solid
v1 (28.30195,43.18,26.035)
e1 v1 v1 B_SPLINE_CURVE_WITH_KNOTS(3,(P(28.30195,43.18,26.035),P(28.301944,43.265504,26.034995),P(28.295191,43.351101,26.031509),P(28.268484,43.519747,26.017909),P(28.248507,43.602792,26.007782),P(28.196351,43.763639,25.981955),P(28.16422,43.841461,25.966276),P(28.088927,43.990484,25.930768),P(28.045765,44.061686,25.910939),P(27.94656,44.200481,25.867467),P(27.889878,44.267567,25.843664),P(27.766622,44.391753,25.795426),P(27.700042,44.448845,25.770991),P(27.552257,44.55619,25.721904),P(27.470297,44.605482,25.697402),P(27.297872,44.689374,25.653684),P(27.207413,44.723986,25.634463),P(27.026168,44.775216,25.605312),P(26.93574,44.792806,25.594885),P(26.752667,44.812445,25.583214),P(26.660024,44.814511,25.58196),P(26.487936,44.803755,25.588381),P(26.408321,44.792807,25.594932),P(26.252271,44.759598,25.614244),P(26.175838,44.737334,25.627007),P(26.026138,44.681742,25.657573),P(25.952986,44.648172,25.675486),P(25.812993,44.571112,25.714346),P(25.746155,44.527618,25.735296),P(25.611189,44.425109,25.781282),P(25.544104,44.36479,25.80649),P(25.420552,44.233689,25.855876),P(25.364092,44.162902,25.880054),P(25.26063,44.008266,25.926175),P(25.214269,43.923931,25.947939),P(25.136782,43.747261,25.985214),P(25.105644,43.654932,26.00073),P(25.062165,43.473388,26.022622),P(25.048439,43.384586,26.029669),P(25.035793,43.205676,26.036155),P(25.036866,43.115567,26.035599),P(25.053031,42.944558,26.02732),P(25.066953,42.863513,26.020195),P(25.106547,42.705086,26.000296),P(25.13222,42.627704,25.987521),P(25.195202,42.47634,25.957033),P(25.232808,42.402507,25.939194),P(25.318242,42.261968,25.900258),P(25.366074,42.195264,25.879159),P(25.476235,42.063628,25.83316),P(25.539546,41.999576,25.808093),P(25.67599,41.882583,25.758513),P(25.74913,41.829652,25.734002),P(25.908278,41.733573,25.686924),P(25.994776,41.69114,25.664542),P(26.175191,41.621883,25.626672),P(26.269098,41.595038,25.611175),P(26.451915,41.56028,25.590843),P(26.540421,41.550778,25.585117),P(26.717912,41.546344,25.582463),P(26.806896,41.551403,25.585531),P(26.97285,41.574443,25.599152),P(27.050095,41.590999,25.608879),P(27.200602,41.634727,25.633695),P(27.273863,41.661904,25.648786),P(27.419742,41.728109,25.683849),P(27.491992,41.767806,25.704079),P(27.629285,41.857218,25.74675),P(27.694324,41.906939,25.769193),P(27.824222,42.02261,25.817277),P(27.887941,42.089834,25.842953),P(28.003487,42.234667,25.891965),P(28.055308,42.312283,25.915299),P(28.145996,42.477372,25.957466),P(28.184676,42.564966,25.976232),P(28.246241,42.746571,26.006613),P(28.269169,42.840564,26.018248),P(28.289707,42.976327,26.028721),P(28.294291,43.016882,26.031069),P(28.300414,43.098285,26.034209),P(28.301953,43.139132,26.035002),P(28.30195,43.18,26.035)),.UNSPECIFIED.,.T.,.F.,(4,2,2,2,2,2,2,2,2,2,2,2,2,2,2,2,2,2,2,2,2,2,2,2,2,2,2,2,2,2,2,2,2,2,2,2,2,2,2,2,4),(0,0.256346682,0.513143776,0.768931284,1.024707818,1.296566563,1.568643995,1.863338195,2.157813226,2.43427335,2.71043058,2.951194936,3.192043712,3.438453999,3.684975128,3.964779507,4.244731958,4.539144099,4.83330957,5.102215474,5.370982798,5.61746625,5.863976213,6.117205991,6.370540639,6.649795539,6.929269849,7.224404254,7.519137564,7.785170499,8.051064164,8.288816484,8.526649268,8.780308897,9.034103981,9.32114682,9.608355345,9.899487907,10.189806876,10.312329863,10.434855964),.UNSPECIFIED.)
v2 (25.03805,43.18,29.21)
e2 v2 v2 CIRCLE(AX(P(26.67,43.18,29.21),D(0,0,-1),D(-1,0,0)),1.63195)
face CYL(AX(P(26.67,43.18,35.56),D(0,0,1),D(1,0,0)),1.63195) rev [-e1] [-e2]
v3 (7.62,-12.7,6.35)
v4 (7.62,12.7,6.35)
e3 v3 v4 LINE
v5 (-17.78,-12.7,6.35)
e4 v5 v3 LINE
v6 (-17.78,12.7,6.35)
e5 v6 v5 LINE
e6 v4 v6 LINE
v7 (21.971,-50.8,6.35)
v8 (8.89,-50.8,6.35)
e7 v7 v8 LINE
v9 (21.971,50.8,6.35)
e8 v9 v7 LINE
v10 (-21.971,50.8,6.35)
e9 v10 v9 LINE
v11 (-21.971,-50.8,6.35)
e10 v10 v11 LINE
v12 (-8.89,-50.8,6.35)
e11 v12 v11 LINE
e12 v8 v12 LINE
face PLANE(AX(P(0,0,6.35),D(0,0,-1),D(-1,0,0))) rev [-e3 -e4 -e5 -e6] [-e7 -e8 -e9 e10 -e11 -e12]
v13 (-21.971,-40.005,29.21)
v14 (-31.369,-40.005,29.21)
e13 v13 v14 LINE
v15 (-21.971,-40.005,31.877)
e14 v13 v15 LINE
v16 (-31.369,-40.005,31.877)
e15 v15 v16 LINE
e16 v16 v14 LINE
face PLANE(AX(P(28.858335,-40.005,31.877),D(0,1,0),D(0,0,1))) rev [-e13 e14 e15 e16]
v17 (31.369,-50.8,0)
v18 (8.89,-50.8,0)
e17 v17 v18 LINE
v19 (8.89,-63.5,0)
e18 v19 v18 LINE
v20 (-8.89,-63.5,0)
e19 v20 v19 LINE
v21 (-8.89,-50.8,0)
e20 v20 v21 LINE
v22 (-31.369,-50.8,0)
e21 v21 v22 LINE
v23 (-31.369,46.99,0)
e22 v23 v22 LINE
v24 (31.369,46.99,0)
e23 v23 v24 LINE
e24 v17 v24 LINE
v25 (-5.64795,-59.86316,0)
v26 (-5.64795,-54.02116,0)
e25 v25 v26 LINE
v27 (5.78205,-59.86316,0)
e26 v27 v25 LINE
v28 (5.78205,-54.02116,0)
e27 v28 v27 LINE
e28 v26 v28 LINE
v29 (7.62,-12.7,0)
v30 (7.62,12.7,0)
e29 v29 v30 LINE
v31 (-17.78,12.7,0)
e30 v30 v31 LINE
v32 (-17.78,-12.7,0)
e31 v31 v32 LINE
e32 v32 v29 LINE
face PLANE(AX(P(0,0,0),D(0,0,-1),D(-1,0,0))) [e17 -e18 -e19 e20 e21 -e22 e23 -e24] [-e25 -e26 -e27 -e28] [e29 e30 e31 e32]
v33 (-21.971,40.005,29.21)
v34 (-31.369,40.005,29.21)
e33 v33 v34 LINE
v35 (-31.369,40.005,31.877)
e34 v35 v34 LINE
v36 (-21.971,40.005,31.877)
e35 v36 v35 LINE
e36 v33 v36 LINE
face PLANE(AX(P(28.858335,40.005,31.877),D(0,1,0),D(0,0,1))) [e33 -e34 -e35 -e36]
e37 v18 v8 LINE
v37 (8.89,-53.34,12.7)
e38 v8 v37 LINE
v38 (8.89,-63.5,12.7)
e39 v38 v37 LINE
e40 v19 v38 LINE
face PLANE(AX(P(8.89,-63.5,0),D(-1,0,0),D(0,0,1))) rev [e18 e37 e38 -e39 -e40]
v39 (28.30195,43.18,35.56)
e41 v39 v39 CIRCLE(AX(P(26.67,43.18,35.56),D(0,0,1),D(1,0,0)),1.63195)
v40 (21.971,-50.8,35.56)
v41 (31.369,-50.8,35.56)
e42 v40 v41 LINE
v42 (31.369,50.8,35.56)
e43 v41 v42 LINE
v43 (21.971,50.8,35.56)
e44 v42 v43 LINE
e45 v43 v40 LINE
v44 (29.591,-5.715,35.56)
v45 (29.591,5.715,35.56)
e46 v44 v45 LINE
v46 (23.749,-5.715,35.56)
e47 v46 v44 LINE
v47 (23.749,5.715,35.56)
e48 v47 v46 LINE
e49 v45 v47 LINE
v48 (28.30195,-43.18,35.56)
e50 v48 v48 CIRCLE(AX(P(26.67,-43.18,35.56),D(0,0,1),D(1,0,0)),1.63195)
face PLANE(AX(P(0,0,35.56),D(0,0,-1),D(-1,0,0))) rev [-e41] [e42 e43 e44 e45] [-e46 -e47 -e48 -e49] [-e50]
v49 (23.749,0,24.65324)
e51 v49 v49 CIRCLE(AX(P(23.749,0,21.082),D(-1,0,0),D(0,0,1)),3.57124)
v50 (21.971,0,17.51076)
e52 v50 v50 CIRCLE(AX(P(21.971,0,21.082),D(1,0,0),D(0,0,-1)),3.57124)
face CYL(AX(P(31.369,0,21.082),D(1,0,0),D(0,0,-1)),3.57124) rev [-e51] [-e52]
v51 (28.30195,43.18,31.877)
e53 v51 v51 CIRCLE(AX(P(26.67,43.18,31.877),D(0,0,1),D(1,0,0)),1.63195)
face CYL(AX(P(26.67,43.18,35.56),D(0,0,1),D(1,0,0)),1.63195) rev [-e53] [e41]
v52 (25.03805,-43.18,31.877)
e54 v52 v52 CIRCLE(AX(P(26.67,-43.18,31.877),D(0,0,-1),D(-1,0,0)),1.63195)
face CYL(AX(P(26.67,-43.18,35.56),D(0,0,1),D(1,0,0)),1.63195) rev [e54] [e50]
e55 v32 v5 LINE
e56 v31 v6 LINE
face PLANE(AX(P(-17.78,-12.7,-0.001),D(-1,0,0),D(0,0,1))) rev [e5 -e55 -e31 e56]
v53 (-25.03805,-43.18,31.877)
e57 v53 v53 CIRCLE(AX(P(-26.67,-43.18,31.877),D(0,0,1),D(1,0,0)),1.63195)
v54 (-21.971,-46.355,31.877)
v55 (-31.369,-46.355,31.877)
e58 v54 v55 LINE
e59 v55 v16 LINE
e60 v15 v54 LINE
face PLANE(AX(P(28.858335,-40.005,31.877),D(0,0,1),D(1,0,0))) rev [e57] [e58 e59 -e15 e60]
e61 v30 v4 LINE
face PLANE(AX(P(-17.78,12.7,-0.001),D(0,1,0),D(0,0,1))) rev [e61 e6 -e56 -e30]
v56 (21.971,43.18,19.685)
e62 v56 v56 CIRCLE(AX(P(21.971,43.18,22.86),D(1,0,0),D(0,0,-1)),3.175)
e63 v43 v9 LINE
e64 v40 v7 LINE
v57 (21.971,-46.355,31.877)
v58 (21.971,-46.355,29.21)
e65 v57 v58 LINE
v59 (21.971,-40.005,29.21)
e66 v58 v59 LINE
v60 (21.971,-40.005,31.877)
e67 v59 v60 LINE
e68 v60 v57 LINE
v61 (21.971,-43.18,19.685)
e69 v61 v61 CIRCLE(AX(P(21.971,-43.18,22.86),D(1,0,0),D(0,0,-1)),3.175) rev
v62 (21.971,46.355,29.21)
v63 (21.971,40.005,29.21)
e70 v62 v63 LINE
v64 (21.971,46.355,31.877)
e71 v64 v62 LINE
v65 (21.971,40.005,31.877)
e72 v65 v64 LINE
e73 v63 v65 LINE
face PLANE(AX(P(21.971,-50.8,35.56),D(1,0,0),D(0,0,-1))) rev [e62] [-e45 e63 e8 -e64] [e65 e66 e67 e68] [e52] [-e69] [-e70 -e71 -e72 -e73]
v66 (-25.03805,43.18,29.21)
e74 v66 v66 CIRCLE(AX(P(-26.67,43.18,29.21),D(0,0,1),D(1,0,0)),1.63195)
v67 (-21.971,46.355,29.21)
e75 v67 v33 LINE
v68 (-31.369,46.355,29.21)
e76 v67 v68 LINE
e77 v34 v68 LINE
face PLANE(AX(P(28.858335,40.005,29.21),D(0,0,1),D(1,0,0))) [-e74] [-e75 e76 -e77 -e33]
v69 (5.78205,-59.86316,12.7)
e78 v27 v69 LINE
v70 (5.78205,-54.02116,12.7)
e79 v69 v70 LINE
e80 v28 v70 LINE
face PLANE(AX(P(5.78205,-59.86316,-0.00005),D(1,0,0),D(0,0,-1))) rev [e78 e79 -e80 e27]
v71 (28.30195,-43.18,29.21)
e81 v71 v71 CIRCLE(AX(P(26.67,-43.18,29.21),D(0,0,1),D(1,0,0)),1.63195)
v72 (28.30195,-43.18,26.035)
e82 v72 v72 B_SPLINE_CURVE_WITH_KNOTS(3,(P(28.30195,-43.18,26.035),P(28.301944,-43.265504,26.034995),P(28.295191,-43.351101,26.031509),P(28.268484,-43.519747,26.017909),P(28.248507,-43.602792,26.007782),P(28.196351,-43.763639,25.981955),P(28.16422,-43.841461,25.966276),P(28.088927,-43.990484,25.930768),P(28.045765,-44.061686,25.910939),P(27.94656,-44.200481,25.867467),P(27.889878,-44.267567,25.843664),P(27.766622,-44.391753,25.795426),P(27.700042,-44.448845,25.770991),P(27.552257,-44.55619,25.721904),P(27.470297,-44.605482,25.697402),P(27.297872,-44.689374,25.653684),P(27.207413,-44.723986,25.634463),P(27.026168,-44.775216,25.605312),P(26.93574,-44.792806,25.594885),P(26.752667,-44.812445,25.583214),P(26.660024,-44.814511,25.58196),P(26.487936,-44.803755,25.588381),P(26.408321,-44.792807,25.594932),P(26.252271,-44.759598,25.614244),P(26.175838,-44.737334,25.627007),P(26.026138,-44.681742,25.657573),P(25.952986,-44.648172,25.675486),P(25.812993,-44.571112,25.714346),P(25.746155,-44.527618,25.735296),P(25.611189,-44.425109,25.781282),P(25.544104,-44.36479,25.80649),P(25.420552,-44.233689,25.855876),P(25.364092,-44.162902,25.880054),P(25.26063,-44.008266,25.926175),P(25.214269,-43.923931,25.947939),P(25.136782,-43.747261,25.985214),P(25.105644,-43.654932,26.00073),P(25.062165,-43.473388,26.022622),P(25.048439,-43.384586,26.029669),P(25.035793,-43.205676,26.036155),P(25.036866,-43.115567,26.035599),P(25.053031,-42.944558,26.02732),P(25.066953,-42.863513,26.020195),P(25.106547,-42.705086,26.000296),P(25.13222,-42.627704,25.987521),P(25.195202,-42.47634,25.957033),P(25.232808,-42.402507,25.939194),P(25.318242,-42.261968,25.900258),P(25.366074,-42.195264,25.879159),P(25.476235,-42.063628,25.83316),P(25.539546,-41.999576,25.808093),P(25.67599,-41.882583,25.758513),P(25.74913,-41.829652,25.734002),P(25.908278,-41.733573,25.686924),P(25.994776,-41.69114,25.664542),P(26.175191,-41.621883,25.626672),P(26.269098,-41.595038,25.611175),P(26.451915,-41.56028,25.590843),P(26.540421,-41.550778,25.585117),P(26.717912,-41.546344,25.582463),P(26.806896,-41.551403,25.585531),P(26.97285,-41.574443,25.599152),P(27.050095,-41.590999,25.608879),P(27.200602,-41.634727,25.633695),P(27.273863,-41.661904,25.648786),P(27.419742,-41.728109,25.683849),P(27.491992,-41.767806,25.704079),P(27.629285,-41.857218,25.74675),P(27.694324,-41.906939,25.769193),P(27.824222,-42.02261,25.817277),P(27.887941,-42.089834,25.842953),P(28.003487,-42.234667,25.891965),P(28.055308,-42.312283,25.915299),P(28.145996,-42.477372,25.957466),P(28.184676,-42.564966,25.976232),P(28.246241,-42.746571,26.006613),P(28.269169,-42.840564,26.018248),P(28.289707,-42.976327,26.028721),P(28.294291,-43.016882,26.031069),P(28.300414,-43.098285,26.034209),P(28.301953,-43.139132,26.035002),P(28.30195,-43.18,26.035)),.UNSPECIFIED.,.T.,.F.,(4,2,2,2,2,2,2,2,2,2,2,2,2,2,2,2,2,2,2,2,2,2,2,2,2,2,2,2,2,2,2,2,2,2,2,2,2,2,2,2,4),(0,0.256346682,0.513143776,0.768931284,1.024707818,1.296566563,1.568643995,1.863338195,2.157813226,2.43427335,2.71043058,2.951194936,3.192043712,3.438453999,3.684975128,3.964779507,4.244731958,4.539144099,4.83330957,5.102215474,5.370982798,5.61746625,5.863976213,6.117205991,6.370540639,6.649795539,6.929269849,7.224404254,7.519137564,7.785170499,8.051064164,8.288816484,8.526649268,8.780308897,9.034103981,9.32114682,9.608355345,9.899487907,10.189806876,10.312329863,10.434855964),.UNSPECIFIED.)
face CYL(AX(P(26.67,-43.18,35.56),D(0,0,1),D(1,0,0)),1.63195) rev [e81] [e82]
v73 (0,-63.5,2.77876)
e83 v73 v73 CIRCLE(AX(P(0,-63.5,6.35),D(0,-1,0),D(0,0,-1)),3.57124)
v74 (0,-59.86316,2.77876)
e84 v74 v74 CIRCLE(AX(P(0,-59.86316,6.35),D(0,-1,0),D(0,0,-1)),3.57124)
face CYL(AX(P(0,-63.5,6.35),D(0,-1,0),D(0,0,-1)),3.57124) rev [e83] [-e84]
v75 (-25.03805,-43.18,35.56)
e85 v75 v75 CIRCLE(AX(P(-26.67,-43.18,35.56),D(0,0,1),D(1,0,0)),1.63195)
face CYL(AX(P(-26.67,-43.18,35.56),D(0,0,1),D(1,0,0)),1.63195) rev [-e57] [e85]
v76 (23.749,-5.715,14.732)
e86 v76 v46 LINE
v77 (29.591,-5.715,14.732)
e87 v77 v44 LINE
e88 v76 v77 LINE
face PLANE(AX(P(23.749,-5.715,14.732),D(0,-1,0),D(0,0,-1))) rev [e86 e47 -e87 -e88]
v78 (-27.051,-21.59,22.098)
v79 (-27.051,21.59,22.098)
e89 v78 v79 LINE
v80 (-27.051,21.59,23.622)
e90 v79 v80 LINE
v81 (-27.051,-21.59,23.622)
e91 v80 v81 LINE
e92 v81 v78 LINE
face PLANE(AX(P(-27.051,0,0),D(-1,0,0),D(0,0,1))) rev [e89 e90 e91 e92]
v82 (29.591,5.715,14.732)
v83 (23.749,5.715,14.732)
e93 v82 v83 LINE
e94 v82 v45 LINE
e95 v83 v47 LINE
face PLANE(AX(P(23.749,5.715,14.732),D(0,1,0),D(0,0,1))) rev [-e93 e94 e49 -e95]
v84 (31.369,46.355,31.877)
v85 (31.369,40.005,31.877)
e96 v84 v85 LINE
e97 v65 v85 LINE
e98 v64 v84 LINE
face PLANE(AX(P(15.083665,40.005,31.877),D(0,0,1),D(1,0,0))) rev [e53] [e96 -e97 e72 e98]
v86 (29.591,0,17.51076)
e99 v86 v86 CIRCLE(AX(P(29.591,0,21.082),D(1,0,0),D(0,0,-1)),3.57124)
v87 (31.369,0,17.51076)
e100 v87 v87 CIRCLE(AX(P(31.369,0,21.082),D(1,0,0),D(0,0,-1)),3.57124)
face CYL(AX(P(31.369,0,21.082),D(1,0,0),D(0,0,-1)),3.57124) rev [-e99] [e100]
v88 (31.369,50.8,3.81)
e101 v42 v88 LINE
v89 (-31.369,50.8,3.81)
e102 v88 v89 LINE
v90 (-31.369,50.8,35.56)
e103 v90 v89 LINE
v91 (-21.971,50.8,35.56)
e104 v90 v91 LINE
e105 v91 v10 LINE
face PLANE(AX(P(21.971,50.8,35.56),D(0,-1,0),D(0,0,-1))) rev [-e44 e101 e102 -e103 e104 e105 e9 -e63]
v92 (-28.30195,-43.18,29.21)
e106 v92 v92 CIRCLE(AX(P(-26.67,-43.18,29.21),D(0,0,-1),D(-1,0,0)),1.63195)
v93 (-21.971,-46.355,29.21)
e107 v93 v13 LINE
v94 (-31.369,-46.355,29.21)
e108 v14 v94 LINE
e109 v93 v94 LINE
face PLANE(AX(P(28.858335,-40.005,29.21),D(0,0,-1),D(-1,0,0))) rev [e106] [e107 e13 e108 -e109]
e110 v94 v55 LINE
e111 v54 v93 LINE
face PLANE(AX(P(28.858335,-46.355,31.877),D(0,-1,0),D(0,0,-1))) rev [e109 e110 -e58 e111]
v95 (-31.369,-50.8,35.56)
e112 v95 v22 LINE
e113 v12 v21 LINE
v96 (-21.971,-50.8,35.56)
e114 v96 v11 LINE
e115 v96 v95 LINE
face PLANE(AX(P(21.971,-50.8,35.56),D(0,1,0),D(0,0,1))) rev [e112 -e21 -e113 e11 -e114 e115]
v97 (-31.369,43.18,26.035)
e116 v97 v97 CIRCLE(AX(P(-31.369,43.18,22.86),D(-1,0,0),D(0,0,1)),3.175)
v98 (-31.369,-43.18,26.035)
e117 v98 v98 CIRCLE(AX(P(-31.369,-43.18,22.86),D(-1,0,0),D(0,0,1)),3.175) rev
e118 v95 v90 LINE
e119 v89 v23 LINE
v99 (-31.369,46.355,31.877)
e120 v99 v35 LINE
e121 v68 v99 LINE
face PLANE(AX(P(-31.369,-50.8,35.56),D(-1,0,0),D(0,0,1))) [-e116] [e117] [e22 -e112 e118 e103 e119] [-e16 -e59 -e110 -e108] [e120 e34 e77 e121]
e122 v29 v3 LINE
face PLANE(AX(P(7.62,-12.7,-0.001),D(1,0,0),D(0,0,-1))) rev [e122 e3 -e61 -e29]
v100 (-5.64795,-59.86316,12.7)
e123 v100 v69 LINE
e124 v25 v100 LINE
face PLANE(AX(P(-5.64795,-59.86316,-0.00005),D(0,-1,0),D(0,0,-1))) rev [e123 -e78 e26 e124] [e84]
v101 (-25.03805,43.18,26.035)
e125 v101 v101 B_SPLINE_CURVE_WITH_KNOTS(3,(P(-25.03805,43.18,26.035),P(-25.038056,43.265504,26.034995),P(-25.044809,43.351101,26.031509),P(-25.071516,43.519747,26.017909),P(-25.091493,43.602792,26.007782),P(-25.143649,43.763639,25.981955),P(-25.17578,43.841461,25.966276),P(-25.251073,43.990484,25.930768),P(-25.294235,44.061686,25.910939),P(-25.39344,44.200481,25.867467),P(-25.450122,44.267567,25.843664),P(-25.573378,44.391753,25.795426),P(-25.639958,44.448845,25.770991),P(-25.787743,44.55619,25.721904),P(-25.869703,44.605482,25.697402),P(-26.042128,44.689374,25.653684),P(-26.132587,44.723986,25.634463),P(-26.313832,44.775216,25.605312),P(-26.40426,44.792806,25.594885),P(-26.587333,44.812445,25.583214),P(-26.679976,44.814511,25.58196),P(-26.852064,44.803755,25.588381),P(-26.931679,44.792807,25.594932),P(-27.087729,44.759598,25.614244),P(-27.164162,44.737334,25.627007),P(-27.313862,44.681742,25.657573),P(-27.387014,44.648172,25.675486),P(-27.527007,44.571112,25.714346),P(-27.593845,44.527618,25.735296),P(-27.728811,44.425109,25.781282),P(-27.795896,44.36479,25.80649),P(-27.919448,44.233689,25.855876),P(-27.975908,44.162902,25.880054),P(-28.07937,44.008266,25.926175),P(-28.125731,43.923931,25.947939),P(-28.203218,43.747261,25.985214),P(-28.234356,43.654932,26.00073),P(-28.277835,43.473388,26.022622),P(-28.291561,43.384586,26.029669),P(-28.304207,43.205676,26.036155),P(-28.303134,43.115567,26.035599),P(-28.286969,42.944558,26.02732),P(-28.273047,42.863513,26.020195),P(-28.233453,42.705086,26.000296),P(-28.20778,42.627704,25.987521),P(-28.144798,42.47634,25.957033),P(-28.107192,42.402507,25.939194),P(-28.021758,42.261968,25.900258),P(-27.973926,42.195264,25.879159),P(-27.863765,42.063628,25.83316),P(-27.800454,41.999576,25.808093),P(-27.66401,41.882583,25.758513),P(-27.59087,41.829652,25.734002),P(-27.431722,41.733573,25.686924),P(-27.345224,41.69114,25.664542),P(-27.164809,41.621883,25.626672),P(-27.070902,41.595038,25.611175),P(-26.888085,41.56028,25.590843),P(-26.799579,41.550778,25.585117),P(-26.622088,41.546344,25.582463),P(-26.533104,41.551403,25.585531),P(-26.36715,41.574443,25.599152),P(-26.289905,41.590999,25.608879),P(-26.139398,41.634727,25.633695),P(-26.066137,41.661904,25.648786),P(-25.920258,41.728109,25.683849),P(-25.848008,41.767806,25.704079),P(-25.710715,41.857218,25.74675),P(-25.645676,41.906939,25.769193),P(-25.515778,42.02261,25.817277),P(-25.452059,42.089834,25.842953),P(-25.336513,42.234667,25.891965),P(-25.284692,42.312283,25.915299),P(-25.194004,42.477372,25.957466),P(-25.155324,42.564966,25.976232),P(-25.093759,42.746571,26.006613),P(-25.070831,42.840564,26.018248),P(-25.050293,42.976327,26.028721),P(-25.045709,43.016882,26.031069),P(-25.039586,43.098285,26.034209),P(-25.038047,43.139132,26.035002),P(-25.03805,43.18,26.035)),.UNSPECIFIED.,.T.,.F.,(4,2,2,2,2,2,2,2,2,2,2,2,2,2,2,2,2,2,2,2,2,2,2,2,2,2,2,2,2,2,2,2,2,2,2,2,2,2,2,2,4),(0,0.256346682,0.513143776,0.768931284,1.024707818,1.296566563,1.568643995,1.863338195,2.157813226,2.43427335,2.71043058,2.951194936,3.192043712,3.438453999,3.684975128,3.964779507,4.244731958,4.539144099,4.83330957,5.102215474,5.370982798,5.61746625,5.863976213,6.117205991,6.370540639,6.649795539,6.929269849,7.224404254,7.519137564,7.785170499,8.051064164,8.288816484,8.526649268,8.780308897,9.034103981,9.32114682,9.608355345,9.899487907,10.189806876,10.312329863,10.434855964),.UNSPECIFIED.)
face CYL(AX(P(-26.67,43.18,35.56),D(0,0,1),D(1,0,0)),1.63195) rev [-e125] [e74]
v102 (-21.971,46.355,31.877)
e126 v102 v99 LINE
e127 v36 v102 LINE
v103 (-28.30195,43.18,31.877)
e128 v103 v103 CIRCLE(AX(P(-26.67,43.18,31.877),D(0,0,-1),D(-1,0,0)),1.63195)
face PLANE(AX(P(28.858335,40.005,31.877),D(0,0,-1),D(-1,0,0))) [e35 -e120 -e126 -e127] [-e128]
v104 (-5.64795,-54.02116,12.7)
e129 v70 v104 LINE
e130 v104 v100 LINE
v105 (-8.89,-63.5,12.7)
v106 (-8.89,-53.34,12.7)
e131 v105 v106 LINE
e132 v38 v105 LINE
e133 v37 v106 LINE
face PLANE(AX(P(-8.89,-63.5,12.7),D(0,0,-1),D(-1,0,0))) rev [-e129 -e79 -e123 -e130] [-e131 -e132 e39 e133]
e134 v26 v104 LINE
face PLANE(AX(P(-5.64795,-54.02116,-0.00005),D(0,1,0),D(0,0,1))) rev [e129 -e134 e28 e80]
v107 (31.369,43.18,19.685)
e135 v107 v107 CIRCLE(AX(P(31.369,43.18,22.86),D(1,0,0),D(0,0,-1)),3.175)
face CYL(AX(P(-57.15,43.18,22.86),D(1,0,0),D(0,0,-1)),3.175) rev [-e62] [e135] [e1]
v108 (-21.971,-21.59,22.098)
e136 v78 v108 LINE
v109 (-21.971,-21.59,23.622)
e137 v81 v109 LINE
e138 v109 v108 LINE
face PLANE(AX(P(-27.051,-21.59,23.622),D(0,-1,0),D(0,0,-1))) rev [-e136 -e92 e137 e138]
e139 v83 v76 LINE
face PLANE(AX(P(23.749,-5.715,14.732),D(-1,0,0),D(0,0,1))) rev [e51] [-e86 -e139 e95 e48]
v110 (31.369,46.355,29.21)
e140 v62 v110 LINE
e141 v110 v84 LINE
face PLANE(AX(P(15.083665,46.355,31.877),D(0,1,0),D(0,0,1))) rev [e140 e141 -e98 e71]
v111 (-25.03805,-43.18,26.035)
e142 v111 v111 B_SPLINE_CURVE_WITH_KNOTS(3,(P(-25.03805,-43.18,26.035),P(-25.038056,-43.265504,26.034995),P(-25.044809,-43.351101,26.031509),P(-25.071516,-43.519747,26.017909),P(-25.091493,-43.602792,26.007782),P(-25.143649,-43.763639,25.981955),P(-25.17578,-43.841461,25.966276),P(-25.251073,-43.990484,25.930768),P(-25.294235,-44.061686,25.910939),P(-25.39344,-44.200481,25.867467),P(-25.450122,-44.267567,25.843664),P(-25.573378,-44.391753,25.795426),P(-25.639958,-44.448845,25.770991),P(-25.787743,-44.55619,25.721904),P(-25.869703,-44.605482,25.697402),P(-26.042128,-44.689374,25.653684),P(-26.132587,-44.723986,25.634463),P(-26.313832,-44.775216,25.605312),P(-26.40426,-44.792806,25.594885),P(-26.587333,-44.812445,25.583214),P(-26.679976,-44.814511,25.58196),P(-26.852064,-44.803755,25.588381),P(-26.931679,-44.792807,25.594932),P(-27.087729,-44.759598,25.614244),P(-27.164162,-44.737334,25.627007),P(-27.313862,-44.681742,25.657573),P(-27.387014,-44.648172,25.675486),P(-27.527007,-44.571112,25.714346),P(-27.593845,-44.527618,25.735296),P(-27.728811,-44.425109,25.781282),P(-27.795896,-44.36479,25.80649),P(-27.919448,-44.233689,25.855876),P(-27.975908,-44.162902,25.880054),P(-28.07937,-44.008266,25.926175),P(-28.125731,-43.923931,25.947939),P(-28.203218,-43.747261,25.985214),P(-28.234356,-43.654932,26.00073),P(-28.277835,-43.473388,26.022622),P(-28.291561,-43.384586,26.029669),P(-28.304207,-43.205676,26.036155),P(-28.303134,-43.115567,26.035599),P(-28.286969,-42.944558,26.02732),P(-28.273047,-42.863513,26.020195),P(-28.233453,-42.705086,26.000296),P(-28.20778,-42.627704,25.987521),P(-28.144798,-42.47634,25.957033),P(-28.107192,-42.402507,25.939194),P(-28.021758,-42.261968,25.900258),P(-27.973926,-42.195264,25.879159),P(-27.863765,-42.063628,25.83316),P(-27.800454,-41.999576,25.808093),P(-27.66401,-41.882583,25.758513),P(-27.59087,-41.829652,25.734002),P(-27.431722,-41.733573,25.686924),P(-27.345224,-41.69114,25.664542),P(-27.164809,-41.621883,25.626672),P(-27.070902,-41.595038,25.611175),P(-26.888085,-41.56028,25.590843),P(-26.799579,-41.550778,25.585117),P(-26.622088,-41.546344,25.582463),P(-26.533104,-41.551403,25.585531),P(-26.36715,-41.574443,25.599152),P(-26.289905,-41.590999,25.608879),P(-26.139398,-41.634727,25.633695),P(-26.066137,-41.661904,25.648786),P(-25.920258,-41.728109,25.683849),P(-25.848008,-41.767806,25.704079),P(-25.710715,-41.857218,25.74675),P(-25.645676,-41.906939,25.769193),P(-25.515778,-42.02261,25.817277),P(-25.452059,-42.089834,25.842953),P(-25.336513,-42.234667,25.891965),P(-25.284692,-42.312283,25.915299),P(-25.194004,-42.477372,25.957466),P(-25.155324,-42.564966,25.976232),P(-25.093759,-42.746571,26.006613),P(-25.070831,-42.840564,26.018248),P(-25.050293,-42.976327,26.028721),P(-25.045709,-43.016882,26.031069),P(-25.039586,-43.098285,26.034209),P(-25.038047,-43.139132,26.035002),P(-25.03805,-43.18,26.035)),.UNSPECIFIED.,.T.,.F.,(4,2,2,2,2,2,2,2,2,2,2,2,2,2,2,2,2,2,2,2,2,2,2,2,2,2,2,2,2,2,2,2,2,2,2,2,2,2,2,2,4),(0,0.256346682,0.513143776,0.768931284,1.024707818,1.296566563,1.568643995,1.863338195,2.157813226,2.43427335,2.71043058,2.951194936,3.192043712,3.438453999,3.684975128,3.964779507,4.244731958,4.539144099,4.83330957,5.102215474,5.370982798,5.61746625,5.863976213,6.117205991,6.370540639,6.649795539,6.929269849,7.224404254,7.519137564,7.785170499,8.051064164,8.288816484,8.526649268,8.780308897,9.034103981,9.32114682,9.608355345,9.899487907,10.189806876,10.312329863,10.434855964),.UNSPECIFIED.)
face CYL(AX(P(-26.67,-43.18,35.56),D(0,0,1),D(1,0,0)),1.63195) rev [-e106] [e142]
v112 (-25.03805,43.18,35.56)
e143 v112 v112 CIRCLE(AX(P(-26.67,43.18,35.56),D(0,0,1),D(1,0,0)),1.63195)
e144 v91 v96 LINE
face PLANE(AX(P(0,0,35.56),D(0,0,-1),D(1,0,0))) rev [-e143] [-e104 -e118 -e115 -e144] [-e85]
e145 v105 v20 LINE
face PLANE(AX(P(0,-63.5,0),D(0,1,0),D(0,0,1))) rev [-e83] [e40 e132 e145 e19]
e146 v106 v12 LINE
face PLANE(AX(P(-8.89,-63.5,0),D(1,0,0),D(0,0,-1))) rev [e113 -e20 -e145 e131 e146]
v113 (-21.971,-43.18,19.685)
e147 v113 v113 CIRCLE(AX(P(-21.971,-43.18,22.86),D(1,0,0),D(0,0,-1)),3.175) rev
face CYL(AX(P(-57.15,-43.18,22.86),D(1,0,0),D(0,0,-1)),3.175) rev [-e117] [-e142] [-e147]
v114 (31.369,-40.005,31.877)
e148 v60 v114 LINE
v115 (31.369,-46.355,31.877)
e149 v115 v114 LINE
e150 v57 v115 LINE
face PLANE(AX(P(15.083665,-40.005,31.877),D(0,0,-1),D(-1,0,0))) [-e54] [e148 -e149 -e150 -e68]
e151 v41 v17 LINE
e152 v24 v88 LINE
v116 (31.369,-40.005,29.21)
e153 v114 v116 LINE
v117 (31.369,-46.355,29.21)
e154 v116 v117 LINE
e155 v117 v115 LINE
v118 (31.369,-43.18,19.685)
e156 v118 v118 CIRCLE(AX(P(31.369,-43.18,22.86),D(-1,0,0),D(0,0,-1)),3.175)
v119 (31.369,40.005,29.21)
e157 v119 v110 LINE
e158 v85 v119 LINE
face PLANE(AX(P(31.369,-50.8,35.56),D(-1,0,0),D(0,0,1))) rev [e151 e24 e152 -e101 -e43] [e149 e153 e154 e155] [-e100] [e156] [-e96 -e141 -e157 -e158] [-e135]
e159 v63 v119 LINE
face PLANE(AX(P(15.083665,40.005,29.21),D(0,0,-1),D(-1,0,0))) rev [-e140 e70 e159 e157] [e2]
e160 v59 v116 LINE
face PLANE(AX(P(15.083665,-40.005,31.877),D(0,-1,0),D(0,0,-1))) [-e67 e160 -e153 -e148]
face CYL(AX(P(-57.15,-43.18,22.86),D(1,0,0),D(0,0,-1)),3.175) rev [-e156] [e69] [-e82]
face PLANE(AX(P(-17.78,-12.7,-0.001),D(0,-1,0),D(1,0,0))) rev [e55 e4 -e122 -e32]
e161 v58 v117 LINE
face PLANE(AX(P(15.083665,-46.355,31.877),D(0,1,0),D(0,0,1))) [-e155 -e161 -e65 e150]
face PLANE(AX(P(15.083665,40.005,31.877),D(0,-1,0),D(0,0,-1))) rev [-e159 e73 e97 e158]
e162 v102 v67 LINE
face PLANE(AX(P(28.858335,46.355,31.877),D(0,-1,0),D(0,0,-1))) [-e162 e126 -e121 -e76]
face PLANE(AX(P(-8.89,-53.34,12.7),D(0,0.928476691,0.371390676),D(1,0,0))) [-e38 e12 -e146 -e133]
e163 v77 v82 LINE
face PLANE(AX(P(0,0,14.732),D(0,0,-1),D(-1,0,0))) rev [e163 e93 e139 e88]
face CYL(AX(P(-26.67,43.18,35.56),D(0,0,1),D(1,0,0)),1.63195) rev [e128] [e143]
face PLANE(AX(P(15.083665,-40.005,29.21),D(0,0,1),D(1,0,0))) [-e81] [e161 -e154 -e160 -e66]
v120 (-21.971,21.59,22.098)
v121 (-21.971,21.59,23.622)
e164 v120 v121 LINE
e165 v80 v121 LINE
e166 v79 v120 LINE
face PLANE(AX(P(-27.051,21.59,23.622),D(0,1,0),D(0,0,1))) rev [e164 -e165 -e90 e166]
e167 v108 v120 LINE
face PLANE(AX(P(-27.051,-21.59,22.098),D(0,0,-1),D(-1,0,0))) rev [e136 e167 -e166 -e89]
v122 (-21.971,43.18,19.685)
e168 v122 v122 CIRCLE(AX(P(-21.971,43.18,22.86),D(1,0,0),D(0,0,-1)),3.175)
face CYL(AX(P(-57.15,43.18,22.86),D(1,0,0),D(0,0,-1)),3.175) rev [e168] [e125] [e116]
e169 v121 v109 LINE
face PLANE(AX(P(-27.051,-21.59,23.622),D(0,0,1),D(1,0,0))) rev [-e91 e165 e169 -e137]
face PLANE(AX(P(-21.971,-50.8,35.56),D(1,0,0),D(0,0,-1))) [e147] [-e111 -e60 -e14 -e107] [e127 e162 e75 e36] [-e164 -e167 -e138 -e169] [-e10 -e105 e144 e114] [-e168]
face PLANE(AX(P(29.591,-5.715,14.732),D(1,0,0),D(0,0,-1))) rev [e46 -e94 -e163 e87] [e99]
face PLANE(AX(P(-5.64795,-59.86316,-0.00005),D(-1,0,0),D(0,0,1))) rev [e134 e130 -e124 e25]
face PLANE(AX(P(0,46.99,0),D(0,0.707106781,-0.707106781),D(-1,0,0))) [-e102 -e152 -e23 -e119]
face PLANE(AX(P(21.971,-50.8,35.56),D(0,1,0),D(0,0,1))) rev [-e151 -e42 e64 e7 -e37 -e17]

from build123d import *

# Parameters (mm, degrees)
SKETCH1_W                   = 114.3
SKETCH1_H                   = 127
BOSS_EXTRUDE1_DEPTH         = 6.35
SKETCH2_W                   = 9.398
SKETCH2_H                   = 101.6
BOSS_EXTRUDE2_DEPTH         = 29.21
SKETCH10_R                  = 3.175
CUT_EXTRUDE1_DEPTH          = 115.596583549
SKETCH13_W                  = 2.667
SKETCH13_H                  = 6.35
CUT_EXTRUDE2_DEPTH          = 9.398
CUT_EXTRUDE3_REACH          = 92.286
SKETCH15_W                  = 25.4
SKETCH15_H                  = 25.4
MIRROR4_COPY_1_SKETCH_W     = 2.667
MIRROR4_COPY_1_SKETCH_H     = 6.35
MIRROR4_COPY_1_DEPTH        = 9.398
SKETCH19_W                  = 1.524
SKETCH19_H                  = 43.18
CUT_EXTRUDE4_DEPTH          = 5.08
SKETCH23_W                  = 5.842
SKETCH23_H                  = 11.43
CUT_EXTRUDE5_DEPTH          = 20.828
SKETCH24_W                  = 127.881325932
SKETCH24_H                  = 16.190143287
CUT_EXTRUDE6_DEPTH          = 12.7
SKETCH26_W                  = 20.33012471
SKETCH26_H                  = 111.91731712
CUT_EXTRUDE8_DEPTH          = 25.781
CHAMFER1_SIZE               = 3.81
SKETCH28_W                  = 17.78
SKETCH28_H                  = 12.7
BOSS_EXTRUDE3_DEPTH         = 12.7
SKETCH30_W                  = 11.43
SKETCH30_H                  = 5.842
CUT_EXTRUDE9_DEPTH          = 75.423408732
F_1_4_CLEARANCE_HOLE1_D     = 7.14248
F_1_4_CLEARANCE_HOLE1_DEPTH = 3.636839777
CHAMFER3_SIZE2              = 6.35
CHAMFER3_SIZE               = 2.54
F_1_4_CLEARANCE_HOLE2_D     = 7.14248
F_1_4_CLEARANCE_HOLE2_DEPTH = 15.24


with BuildPart() as part:
    # Sketch1 → Boss-Extrude1 (new body)
    with BuildSketch(Plane.XY):
        Rectangle(SKETCH1_W, SKETCH1_H)
    extrude(amount=BOSS_EXTRUDE1_DEPTH)

    # Sketch2 → Boss-Extrude2 (add)
    with BuildSketch(Plane.XY.offset(6.35)):
        with Locations((26.67, 0)):
            Rectangle(SKETCH2_W, SKETCH2_H)
    boss_extrude2 = extrude(amount=BOSS_EXTRUDE2_DEPTH)

    # Mirror1: Boss-Extrude2 across plane
    add(boss_extrude2.mirror(Plane(origin=(0, 0, 0), x_dir=(0, 0, 1), z_dir=(1, 0, 0))))

    # Sketch10 → Cut-Extrude1 (cut, through all)
    with BuildSketch(Plane(origin=(31.369, 0, 0), x_dir=(0, 0, -1), z_dir=(1, 0, 0))):
        with Locations((-22.86, 43.18)):
            Circle(SKETCH10_R)
    cut_extrude1 = extrude(amount=-CUT_EXTRUDE1_DEPTH, mode=Mode.SUBTRACT)

    # Mirror2: Cut-Extrude1 across plane
    add(cut_extrude1.mirror(Plane.ZX), mode=Mode.SUBTRACT)

    # Sketch13 → Cut-Extrude2 (cut)
    with BuildSketch(Plane(origin=(31.369, 0, 0), x_dir=(0, 0, -1), z_dir=(1, 0, 0))):
        with Locations((-30.5435, 43.18)):
            Rectangle(SKETCH13_W, SKETCH13_H)
    cut_extrude2 = extrude(amount=-CUT_EXTRUDE2_DEPTH, mode=Mode.SUBTRACT)

    # Sketch15 → Cut-Extrude3 (cut, up to next)
    with BuildSketch(Plane.XY.offset(6.35), mode=Mode.PRIVATE) as cut_extrude3_sk1:
        with Locations((-5.08, 0)):
            Rectangle(SKETCH15_W, SKETCH15_H)
    cut_extrude3_tool1 = extrude(cut_extrude3_sk1.sketch, amount=-CUT_EXTRUDE3_REACH, mode=Mode.PRIVATE) & part.part
    add(cut_extrude3_tool1.solids().sort_by_distance((-5.08, 0, 6.35))[0], mode=Mode.SUBTRACT)

    # Sketch16 → #4 Clearance Hole1 (revolve, cut)
    with BuildSketch(Plane(origin=(26.67, 43.18, 35.56), x_dir=(0, -1, 0), z_dir=(1, 0, 0))):
        Polygon((0, 0), (0, 12.918574487), (1.63195, 11.938), (1.63195, 0), align=None)
    f_4_clearance_hole1 = revolve(axis=Axis((26.67, 43.18, 41.91), (0, 0, -1)), mode=Mode.SUBTRACT)

    # Mirror3: Cut-Extrude2, #4 Clearance Hole1 across plane
    add(cut_extrude2.mirror(Plane(origin=(0, 0, 0), x_dir=(0, 0, 1), z_dir=(1, 0, 0))), mode=Mode.SUBTRACT)
    add(f_4_clearance_hole1.mirror(Plane(origin=(0, 0, 0), x_dir=(0, 0, 1), z_dir=(1, 0, 0))), mode=Mode.SUBTRACT)

    # Mirror4: Cut-Extrude2, #4 Clearance Hole1 across plane
    add(cut_extrude2.mirror(Plane.ZX), mode=Mode.SUBTRACT)
    add(f_4_clearance_hole1.mirror(Plane.ZX), mode=Mode.SUBTRACT)

    # Mirror4 copy 1 sketch → Mirror4 copy 1 (cut)
    with BuildSketch(Plane(origin=(-31.369, 0, 0), x_dir=(0, 0, -1), z_dir=(-1, 0, 0))):
        with Locations((-30.5435, 43.18)):
            Rectangle(MIRROR4_COPY_1_SKETCH_W, MIRROR4_COPY_1_SKETCH_H)
    extrude(amount=-MIRROR4_COPY_1_DEPTH, mode=Mode.SUBTRACT)

    # Mirror4 copy 2 sketch → Mirror4 copy 2 (revolve, cut)
    with BuildSketch(Plane(origin=(-26.67, -43.18, 35.56), x_dir=(0, 1, 0), z_dir=(-1, 0, 0))):
        Polygon((0, 0), (0, 12.918574487), (1.63195, 11.938), (1.63195, 0), align=None)
    revolve(axis=Axis((-26.67, -43.18, 41.91), (0, 0, -1)), mode=Mode.SUBTRACT)

    # Sketch19 → Cut-Extrude4 (cut)
    with BuildSketch(Plane(origin=(-21.971, 0, 0), x_dir=(0, 0, -1), z_dir=(1, 0, 0))):
        with Locations((-22.86, 0)):
            Rectangle(SKETCH19_W, SKETCH19_H)
    extrude(amount=-CUT_EXTRUDE4_DEPTH, mode=Mode.SUBTRACT)

    # Sketch23 → Cut-Extrude5 (cut)
    with BuildSketch(Plane.XY.offset(35.56)):
        with Locations((26.67, 0)):
            Rectangle(SKETCH23_W, SKETCH23_H)
    extrude(amount=-CUT_EXTRUDE5_DEPTH, mode=Mode.SUBTRACT)

    # Sketch24 → Cut-Extrude6 (cut)
    with BuildSketch(Plane(origin=(0, 63.5, 0), x_dir=(1, 0, 0), z_dir=(0, 1, 0))):
        with Locations((0, -3.427395894)):
            Rectangle(SKETCH24_W, SKETCH24_H)
    cut_extrude6 = extrude(amount=-CUT_EXTRUDE6_DEPTH, mode=Mode.SUBTRACT)

    # Mirror5: Cut-Extrude6 across plane
    add(cut_extrude6.mirror(Plane.ZX), mode=Mode.SUBTRACT)

    # Sketch26 → Cut-Extrude8 (cut)
    with BuildSketch(Plane(origin=(57.15, 0, 0), x_dir=(0, 0, -1), z_dir=(1, 0, 0))):
        with Locations((-3.366450344, 0)):
            Rectangle(SKETCH26_W, SKETCH26_H)
    cut_extrude8 = extrude(amount=-CUT_EXTRUDE8_DEPTH, mode=Mode.SUBTRACT)

    # Mirror6: Cut-Extrude8 across plane
    add(cut_extrude8.mirror(Plane(origin=(0, 0, 0), x_dir=(0, 0, 1), z_dir=(1, 0, 0))), mode=Mode.SUBTRACT)

    # Chamfer1
    chamfer1_edges = [part.edges().sort_by_distance(p)[0] for p in [
        (0, 50.8, 0),
    ]]
    chamfer(chamfer1_edges, length=CHAMFER1_SIZE)

    # Sketch28 → Boss-Extrude3 (add)
    with BuildSketch(Plane.XZ.offset(50.8)):
        with Locations((0, 6.35)):
            Rectangle(SKETCH28_W, SKETCH28_H)
    extrude(amount=BOSS_EXTRUDE3_DEPTH)

    # Sketch30 → Cut-Extrude9 (cut, through all)
    with BuildSketch(Plane.XY.offset(12.7)):
        with Locations((0.067049503, -56.942160223)):
            Rectangle(SKETCH30_W, SKETCH30_H)
    extrude(amount=-CUT_EXTRUDE9_DEPTH, mode=Mode.SUBTRACT)

    # 1/4 Clearance Hole1
    with Locations(Plane(origin=(0, -63.5, 0), x_dir=(-1, 0, 0), z_dir=(0, -1, 0))):
        with Locations((0, -6.35)):
            Hole(F_1_4_CLEARANCE_HOLE1_D / 2, depth=F_1_4_CLEARANCE_HOLE1_DEPTH)

    # Chamfer3
    chamfer3_edges = [part.edges().sort_by_distance(p)[0] for p in [
        (0, -50.8, 12.7),
    ]]
    chamfer3_side = [part.faces().sort_by_distance(p)[0] for p in [
        (0, -50.8508, 12.7),
    ]]
    chamfer(chamfer3_edges, length=CHAMFER3_SIZE - 0.0001, length2=CHAMFER3_SIZE2 - 0.0001, reference=chamfer3_side[0])  # a hair under: the kernel refuses the full size

    # 1/4 Clearance Hole2
    with Locations(Plane(origin=(31.369, 0, 0), x_dir=(0, 0, -1), z_dir=(1, 0, 0))):
        with Locations((-21.082, 0)):
            Hole(F_1_4_CLEARANCE_HOLE2_D / 2, depth=F_1_4_CLEARANCE_HOLE2_DEPTH)


solid = part.part
